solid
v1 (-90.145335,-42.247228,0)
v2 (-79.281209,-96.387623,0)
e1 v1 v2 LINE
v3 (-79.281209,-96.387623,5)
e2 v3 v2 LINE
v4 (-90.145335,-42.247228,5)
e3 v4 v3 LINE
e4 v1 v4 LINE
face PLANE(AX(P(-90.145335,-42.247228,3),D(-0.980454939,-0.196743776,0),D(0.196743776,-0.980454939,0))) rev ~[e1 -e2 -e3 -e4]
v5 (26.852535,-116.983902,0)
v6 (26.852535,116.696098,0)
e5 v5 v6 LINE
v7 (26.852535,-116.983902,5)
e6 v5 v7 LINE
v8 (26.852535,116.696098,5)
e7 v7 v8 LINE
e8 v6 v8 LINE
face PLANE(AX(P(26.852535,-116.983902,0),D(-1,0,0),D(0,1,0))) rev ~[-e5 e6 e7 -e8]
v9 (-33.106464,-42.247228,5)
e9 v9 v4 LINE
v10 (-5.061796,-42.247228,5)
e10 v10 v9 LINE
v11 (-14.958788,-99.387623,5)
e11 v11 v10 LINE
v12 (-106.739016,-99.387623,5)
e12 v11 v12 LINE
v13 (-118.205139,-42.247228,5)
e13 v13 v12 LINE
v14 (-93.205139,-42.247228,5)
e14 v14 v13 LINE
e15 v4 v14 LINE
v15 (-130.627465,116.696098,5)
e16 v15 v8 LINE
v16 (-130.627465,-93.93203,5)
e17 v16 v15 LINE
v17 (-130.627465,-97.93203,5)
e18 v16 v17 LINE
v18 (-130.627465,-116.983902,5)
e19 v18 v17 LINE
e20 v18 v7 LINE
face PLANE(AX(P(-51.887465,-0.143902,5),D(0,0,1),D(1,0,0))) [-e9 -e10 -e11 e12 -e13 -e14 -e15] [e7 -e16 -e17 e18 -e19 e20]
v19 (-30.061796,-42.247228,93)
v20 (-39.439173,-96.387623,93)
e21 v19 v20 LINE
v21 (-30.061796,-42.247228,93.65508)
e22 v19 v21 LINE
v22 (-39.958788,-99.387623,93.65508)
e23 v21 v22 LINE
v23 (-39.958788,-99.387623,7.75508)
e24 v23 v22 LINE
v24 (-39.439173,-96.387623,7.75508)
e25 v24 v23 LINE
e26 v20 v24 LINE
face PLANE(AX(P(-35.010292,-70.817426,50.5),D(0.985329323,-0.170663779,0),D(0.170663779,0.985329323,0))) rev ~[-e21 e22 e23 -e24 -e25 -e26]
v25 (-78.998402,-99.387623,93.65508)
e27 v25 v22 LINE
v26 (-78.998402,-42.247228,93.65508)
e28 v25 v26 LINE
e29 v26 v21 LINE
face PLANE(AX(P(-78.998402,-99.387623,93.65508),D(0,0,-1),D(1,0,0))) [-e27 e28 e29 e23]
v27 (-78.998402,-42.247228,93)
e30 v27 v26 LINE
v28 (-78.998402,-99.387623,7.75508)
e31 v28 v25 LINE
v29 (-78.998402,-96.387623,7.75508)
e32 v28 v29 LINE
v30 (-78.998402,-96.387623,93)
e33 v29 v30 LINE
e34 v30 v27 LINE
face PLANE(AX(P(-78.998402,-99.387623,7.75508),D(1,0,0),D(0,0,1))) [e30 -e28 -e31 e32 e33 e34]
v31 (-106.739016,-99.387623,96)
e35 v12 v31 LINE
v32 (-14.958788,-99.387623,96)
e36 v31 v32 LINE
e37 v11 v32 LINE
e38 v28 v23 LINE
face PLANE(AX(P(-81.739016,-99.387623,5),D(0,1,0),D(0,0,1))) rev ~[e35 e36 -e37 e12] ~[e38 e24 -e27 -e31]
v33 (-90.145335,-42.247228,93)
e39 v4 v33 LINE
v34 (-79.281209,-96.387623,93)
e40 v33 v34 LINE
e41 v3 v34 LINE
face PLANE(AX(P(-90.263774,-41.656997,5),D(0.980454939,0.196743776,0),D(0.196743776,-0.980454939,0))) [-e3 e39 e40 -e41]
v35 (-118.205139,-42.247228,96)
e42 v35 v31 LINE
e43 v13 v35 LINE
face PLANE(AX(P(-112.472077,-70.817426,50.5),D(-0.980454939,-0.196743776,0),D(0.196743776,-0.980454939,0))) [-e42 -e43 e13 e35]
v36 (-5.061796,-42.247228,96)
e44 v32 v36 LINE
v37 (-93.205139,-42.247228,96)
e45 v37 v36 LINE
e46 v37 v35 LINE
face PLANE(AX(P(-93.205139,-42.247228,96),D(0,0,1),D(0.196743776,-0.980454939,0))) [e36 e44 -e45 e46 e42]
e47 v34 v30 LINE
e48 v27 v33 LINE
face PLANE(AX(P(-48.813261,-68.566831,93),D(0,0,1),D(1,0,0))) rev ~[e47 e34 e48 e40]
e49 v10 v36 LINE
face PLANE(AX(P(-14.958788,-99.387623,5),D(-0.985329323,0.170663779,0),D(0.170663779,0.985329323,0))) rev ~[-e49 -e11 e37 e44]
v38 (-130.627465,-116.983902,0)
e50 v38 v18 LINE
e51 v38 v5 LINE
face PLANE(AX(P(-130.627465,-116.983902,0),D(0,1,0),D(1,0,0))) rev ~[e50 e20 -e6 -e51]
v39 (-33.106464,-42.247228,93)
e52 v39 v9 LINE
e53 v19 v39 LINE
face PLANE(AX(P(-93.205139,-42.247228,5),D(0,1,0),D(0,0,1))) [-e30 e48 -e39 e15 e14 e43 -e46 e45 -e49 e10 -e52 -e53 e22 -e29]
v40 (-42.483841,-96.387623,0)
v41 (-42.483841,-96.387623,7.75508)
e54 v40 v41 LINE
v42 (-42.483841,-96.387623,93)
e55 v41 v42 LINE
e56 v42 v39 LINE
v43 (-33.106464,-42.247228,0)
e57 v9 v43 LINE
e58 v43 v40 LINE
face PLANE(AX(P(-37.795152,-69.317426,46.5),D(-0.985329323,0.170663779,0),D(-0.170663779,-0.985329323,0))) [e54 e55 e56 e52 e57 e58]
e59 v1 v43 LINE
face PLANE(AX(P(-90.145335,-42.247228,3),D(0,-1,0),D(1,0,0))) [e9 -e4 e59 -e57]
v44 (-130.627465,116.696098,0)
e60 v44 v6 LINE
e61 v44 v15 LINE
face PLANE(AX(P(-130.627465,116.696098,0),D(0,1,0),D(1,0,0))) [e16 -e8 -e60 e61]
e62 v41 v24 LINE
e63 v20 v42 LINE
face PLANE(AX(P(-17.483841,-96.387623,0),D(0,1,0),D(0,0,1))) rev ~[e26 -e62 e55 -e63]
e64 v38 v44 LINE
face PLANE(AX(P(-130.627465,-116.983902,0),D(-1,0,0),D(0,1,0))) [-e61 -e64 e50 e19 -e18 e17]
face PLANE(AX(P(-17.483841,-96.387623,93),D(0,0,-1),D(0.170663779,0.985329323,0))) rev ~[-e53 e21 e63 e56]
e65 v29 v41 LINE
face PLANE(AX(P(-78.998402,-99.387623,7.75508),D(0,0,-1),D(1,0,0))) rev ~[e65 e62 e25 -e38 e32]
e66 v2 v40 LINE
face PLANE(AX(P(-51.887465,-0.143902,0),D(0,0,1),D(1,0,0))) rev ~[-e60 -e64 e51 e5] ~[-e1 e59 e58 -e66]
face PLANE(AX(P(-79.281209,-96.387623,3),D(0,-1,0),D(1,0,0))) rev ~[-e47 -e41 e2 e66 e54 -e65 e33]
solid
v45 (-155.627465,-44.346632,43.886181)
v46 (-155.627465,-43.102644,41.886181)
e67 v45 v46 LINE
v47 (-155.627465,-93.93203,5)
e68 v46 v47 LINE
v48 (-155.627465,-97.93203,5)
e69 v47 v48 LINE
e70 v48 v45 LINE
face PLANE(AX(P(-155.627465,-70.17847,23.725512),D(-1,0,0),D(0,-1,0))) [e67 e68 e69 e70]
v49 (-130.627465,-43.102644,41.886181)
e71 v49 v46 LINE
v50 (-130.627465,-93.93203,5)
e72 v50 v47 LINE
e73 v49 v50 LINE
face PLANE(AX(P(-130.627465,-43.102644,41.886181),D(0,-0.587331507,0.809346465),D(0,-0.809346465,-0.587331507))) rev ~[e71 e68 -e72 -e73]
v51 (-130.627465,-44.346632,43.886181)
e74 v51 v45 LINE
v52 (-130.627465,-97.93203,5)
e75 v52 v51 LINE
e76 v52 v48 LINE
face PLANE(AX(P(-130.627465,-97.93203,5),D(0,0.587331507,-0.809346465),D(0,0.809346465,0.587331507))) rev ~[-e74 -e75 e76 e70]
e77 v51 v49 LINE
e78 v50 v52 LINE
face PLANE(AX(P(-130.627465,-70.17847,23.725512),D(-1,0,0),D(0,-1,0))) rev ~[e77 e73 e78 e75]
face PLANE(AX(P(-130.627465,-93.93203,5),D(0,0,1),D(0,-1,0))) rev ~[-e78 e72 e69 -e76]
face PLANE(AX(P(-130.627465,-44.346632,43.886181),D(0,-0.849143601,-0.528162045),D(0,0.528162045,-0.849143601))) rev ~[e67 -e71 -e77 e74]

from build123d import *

# Parameters (mm, degrees)
F0_W        = 157.48
F0_H        = 233.68
F1_DEPTH    = 5
F3_DEPTH    = 91
F6_T        = 3
F6_T3_DEPTH = 64.2794708824
F6_T5_DEPTH = 72.7802281678
F6_T7_DEPTH = 63.9911646968
F4_W        = 61.3570176065
F4_H        = 85.9
F7_DEPTH    = 71
F8_DEPTH    = 27.4
F3_FACE1_W  = 58.2794708824
F3_FACE1_H  = 91
F3_FACE2_W  = 57.9911646968
F3_FACE2_H  = 91
F10_DEPTH   = 25


# Not quite as in the source:
# - a shell that OpenCascade refuses in one call is made with other operations: the cavity is built on its own and cut out


with BuildPart() as f1:
    # F0 (on Top) → F1 (new body)
    with BuildSketch(Plane.XY):
        with Locations((-51.8874652431, -0.1439023763)):
            Rectangle(F0_W, F0_H)
    extrude(amount=F1_DEPTH)

    # F2 (on face) → F3 (join)
    with BuildSketch(Plane.XY.offset(5)):
        Polygon((-93.2051390409, -42.2472283244), (-81.7390158772, -99.3876233697), (-14.9587877095, -99.3876233697), (-5.0617964007, -42.2472283244), align=None)
    extrude(amount=F3_DEPTH)

    # F6: shell of thickness 3, made by hand


with BuildPart() as f6_core1:
    # F6_t2: copy of F1
    add(f1.part)

    # the walls: a layer under each face that stays
    f6_faces = [f6_core1.faces().sort_by_distance(p)[0] for p in [
        (-51.8874652431, 116.6960976237, 2.5),
        (26.8525347569, -0.1439023763, 2.5),
        (-130.6274652431, -0.1439023763, 2.5),
        (-51.8874652431, -0.1439023763, 0),
        (-51.8874652431, -0.1439023763, 5),
        (-51.8874652431, -116.9839023763, 2.5),
        (-87.4720774591, -70.8174258471, 50.5),
        (-48.3489017934, -99.3876233697, 50.5),
        (-10.0102920551, -70.8174258471, 50.5),
        (-49.1334677208, -70.8174258471, 96),
    ]]
    thicken(f6_faces, amount=-F6_T, mode=Mode.SUBTRACT)

    # F6_s4 → F6_t3 (cut)
    with BuildSketch(Plane(origin=(3.9513966172, -19.6914301777, 0), x_dir=(0, 0, 1), z_dir=(0.196743776, -0.9804549386, 0))):
        Polygon((5.03, 99.7253181003), (2, 99.6953181003), (2, 96.6953181003), (5, 96.6953181003), align=None)
    extrude(amount=F6_T3_DEPTH, mode=Mode.SUBTRACT)

    # F6_s6 → F6_t5 (cut)
    with BuildSketch(Plane.YZ.offset(-84.7390158772)):
        Polygon((-99.4176233697, 5.03), (-99.3876233697, 2), (-96.3876233697, 2), (-96.3876233697, 5), align=None)
    extrude(amount=F6_T5_DEPTH, mode=Mode.SUBTRACT)

    # F6_s8 → F6_t7 (cut)
    with BuildSketch(Plane(origin=(-17.6607081625, -101.9643050803, 0), x_dir=(0, 0, 1), z_dir=(0.1706637789, 0.9853293229, 0))):
        Polygon((5.03, 2.2525352128), (2, 2.2225352128), (2, -0.7774647872), (5, -0.7774647872), align=None)
    extrude(amount=F6_T7_DEPTH, mode=Mode.SUBTRACT)


with BuildPart() as f1_1:
    add(f1.part)

    # what is left inside the walls is the cavity
    f6_cavity = [f6_core1.part.solids().sort_by_distance(p)[0] for p in [
        (-62.799045, -42.277228, 48),
    ]]
    add(f6_cavity, mode=Mode.SUBTRACT)

    # F4 (on face) → F7 (cut)
    with BuildSketch(Plane.XZ.offset(99.3876233697)):
        with Locations((-48.3198929578, 50.7050797723)):
            Rectangle(F4_W, F4_H)
    extrude(amount=-F7_DEPTH, mode=Mode.SUBTRACT)

    # F8 (cut): a face of the model
    f8_faces = [f1_1.faces().sort_by_distance(p)[0] for p in [
        (-48.771647492, -68.0475987274, 3),
    ]]
    extrude(f8_faces, amount=-F8_DEPTH, mode=Mode.SUBTRACT)

    # F9 (on face) + F3_face1 (on face) + F8_face (on face) + F8_face1 (on face) + F3_face2 (on face) → F10 (join)
    with BuildSketch(Plane(origin=(-130.6274652431, 0, 0), x_dir=(0, -1, 0), z_dir=(-1, 0, 0))):
        Polygon((93.9320304401, 5), (97.9320304401, 5), (44.34663196, 43.8861806393), (43.1026443839, 41.8861806393), align=None)
    with BuildSketch(Plane(origin=(-87.4720774591, -70.8174258471, 50.5), x_dir=(0.196743776, -0.9804549386, 0), z_dir=(-0.9804549386, -0.196743776, 0))):
        Rectangle(F3_FACE1_W, F3_FACE1_H)
    with BuildSketch(Plane(origin=(-84.7132721029, -69.3174258471, 46.5), x_dir=(-0.196743776, 0.9804549386, 0), z_dir=(0.9804549386, 0.196743776, 0))):
        Polygon((-27.6098334121, 46.5), (-27.6098334121, -46.5), (27.6098334121, -46.5), (27.6098334121, -41.5), (27.6098334121, 46.5), align=None)
    with BuildSketch(Plane(origin=(-12.7951521703, -69.3174258471, 46.5), x_dir=(-0.1706637789, -0.9853293229, 0), z_dir=(-0.9853293229, 0.1706637789, 0))):
        Polygon((-27.4732486828, -41.5), (-27.4732486828, -46.5), (27.4732486828, -46.5), (27.4732486828, 46.5), (-27.4732486828, 46.5), align=None)
    with BuildSketch(Plane(origin=(-10.0102920551, -70.8174258471, 50.5), x_dir=(0.1706637789, 0.9853293229, 0), z_dir=(0.9853293229, -0.1706637789, 0))):
        Rectangle(F3_FACE2_W, F3_FACE2_H)
    extrude(amount=F10_DEPTH, dir=(-1, 0, 0))


solid = f1_1.part
